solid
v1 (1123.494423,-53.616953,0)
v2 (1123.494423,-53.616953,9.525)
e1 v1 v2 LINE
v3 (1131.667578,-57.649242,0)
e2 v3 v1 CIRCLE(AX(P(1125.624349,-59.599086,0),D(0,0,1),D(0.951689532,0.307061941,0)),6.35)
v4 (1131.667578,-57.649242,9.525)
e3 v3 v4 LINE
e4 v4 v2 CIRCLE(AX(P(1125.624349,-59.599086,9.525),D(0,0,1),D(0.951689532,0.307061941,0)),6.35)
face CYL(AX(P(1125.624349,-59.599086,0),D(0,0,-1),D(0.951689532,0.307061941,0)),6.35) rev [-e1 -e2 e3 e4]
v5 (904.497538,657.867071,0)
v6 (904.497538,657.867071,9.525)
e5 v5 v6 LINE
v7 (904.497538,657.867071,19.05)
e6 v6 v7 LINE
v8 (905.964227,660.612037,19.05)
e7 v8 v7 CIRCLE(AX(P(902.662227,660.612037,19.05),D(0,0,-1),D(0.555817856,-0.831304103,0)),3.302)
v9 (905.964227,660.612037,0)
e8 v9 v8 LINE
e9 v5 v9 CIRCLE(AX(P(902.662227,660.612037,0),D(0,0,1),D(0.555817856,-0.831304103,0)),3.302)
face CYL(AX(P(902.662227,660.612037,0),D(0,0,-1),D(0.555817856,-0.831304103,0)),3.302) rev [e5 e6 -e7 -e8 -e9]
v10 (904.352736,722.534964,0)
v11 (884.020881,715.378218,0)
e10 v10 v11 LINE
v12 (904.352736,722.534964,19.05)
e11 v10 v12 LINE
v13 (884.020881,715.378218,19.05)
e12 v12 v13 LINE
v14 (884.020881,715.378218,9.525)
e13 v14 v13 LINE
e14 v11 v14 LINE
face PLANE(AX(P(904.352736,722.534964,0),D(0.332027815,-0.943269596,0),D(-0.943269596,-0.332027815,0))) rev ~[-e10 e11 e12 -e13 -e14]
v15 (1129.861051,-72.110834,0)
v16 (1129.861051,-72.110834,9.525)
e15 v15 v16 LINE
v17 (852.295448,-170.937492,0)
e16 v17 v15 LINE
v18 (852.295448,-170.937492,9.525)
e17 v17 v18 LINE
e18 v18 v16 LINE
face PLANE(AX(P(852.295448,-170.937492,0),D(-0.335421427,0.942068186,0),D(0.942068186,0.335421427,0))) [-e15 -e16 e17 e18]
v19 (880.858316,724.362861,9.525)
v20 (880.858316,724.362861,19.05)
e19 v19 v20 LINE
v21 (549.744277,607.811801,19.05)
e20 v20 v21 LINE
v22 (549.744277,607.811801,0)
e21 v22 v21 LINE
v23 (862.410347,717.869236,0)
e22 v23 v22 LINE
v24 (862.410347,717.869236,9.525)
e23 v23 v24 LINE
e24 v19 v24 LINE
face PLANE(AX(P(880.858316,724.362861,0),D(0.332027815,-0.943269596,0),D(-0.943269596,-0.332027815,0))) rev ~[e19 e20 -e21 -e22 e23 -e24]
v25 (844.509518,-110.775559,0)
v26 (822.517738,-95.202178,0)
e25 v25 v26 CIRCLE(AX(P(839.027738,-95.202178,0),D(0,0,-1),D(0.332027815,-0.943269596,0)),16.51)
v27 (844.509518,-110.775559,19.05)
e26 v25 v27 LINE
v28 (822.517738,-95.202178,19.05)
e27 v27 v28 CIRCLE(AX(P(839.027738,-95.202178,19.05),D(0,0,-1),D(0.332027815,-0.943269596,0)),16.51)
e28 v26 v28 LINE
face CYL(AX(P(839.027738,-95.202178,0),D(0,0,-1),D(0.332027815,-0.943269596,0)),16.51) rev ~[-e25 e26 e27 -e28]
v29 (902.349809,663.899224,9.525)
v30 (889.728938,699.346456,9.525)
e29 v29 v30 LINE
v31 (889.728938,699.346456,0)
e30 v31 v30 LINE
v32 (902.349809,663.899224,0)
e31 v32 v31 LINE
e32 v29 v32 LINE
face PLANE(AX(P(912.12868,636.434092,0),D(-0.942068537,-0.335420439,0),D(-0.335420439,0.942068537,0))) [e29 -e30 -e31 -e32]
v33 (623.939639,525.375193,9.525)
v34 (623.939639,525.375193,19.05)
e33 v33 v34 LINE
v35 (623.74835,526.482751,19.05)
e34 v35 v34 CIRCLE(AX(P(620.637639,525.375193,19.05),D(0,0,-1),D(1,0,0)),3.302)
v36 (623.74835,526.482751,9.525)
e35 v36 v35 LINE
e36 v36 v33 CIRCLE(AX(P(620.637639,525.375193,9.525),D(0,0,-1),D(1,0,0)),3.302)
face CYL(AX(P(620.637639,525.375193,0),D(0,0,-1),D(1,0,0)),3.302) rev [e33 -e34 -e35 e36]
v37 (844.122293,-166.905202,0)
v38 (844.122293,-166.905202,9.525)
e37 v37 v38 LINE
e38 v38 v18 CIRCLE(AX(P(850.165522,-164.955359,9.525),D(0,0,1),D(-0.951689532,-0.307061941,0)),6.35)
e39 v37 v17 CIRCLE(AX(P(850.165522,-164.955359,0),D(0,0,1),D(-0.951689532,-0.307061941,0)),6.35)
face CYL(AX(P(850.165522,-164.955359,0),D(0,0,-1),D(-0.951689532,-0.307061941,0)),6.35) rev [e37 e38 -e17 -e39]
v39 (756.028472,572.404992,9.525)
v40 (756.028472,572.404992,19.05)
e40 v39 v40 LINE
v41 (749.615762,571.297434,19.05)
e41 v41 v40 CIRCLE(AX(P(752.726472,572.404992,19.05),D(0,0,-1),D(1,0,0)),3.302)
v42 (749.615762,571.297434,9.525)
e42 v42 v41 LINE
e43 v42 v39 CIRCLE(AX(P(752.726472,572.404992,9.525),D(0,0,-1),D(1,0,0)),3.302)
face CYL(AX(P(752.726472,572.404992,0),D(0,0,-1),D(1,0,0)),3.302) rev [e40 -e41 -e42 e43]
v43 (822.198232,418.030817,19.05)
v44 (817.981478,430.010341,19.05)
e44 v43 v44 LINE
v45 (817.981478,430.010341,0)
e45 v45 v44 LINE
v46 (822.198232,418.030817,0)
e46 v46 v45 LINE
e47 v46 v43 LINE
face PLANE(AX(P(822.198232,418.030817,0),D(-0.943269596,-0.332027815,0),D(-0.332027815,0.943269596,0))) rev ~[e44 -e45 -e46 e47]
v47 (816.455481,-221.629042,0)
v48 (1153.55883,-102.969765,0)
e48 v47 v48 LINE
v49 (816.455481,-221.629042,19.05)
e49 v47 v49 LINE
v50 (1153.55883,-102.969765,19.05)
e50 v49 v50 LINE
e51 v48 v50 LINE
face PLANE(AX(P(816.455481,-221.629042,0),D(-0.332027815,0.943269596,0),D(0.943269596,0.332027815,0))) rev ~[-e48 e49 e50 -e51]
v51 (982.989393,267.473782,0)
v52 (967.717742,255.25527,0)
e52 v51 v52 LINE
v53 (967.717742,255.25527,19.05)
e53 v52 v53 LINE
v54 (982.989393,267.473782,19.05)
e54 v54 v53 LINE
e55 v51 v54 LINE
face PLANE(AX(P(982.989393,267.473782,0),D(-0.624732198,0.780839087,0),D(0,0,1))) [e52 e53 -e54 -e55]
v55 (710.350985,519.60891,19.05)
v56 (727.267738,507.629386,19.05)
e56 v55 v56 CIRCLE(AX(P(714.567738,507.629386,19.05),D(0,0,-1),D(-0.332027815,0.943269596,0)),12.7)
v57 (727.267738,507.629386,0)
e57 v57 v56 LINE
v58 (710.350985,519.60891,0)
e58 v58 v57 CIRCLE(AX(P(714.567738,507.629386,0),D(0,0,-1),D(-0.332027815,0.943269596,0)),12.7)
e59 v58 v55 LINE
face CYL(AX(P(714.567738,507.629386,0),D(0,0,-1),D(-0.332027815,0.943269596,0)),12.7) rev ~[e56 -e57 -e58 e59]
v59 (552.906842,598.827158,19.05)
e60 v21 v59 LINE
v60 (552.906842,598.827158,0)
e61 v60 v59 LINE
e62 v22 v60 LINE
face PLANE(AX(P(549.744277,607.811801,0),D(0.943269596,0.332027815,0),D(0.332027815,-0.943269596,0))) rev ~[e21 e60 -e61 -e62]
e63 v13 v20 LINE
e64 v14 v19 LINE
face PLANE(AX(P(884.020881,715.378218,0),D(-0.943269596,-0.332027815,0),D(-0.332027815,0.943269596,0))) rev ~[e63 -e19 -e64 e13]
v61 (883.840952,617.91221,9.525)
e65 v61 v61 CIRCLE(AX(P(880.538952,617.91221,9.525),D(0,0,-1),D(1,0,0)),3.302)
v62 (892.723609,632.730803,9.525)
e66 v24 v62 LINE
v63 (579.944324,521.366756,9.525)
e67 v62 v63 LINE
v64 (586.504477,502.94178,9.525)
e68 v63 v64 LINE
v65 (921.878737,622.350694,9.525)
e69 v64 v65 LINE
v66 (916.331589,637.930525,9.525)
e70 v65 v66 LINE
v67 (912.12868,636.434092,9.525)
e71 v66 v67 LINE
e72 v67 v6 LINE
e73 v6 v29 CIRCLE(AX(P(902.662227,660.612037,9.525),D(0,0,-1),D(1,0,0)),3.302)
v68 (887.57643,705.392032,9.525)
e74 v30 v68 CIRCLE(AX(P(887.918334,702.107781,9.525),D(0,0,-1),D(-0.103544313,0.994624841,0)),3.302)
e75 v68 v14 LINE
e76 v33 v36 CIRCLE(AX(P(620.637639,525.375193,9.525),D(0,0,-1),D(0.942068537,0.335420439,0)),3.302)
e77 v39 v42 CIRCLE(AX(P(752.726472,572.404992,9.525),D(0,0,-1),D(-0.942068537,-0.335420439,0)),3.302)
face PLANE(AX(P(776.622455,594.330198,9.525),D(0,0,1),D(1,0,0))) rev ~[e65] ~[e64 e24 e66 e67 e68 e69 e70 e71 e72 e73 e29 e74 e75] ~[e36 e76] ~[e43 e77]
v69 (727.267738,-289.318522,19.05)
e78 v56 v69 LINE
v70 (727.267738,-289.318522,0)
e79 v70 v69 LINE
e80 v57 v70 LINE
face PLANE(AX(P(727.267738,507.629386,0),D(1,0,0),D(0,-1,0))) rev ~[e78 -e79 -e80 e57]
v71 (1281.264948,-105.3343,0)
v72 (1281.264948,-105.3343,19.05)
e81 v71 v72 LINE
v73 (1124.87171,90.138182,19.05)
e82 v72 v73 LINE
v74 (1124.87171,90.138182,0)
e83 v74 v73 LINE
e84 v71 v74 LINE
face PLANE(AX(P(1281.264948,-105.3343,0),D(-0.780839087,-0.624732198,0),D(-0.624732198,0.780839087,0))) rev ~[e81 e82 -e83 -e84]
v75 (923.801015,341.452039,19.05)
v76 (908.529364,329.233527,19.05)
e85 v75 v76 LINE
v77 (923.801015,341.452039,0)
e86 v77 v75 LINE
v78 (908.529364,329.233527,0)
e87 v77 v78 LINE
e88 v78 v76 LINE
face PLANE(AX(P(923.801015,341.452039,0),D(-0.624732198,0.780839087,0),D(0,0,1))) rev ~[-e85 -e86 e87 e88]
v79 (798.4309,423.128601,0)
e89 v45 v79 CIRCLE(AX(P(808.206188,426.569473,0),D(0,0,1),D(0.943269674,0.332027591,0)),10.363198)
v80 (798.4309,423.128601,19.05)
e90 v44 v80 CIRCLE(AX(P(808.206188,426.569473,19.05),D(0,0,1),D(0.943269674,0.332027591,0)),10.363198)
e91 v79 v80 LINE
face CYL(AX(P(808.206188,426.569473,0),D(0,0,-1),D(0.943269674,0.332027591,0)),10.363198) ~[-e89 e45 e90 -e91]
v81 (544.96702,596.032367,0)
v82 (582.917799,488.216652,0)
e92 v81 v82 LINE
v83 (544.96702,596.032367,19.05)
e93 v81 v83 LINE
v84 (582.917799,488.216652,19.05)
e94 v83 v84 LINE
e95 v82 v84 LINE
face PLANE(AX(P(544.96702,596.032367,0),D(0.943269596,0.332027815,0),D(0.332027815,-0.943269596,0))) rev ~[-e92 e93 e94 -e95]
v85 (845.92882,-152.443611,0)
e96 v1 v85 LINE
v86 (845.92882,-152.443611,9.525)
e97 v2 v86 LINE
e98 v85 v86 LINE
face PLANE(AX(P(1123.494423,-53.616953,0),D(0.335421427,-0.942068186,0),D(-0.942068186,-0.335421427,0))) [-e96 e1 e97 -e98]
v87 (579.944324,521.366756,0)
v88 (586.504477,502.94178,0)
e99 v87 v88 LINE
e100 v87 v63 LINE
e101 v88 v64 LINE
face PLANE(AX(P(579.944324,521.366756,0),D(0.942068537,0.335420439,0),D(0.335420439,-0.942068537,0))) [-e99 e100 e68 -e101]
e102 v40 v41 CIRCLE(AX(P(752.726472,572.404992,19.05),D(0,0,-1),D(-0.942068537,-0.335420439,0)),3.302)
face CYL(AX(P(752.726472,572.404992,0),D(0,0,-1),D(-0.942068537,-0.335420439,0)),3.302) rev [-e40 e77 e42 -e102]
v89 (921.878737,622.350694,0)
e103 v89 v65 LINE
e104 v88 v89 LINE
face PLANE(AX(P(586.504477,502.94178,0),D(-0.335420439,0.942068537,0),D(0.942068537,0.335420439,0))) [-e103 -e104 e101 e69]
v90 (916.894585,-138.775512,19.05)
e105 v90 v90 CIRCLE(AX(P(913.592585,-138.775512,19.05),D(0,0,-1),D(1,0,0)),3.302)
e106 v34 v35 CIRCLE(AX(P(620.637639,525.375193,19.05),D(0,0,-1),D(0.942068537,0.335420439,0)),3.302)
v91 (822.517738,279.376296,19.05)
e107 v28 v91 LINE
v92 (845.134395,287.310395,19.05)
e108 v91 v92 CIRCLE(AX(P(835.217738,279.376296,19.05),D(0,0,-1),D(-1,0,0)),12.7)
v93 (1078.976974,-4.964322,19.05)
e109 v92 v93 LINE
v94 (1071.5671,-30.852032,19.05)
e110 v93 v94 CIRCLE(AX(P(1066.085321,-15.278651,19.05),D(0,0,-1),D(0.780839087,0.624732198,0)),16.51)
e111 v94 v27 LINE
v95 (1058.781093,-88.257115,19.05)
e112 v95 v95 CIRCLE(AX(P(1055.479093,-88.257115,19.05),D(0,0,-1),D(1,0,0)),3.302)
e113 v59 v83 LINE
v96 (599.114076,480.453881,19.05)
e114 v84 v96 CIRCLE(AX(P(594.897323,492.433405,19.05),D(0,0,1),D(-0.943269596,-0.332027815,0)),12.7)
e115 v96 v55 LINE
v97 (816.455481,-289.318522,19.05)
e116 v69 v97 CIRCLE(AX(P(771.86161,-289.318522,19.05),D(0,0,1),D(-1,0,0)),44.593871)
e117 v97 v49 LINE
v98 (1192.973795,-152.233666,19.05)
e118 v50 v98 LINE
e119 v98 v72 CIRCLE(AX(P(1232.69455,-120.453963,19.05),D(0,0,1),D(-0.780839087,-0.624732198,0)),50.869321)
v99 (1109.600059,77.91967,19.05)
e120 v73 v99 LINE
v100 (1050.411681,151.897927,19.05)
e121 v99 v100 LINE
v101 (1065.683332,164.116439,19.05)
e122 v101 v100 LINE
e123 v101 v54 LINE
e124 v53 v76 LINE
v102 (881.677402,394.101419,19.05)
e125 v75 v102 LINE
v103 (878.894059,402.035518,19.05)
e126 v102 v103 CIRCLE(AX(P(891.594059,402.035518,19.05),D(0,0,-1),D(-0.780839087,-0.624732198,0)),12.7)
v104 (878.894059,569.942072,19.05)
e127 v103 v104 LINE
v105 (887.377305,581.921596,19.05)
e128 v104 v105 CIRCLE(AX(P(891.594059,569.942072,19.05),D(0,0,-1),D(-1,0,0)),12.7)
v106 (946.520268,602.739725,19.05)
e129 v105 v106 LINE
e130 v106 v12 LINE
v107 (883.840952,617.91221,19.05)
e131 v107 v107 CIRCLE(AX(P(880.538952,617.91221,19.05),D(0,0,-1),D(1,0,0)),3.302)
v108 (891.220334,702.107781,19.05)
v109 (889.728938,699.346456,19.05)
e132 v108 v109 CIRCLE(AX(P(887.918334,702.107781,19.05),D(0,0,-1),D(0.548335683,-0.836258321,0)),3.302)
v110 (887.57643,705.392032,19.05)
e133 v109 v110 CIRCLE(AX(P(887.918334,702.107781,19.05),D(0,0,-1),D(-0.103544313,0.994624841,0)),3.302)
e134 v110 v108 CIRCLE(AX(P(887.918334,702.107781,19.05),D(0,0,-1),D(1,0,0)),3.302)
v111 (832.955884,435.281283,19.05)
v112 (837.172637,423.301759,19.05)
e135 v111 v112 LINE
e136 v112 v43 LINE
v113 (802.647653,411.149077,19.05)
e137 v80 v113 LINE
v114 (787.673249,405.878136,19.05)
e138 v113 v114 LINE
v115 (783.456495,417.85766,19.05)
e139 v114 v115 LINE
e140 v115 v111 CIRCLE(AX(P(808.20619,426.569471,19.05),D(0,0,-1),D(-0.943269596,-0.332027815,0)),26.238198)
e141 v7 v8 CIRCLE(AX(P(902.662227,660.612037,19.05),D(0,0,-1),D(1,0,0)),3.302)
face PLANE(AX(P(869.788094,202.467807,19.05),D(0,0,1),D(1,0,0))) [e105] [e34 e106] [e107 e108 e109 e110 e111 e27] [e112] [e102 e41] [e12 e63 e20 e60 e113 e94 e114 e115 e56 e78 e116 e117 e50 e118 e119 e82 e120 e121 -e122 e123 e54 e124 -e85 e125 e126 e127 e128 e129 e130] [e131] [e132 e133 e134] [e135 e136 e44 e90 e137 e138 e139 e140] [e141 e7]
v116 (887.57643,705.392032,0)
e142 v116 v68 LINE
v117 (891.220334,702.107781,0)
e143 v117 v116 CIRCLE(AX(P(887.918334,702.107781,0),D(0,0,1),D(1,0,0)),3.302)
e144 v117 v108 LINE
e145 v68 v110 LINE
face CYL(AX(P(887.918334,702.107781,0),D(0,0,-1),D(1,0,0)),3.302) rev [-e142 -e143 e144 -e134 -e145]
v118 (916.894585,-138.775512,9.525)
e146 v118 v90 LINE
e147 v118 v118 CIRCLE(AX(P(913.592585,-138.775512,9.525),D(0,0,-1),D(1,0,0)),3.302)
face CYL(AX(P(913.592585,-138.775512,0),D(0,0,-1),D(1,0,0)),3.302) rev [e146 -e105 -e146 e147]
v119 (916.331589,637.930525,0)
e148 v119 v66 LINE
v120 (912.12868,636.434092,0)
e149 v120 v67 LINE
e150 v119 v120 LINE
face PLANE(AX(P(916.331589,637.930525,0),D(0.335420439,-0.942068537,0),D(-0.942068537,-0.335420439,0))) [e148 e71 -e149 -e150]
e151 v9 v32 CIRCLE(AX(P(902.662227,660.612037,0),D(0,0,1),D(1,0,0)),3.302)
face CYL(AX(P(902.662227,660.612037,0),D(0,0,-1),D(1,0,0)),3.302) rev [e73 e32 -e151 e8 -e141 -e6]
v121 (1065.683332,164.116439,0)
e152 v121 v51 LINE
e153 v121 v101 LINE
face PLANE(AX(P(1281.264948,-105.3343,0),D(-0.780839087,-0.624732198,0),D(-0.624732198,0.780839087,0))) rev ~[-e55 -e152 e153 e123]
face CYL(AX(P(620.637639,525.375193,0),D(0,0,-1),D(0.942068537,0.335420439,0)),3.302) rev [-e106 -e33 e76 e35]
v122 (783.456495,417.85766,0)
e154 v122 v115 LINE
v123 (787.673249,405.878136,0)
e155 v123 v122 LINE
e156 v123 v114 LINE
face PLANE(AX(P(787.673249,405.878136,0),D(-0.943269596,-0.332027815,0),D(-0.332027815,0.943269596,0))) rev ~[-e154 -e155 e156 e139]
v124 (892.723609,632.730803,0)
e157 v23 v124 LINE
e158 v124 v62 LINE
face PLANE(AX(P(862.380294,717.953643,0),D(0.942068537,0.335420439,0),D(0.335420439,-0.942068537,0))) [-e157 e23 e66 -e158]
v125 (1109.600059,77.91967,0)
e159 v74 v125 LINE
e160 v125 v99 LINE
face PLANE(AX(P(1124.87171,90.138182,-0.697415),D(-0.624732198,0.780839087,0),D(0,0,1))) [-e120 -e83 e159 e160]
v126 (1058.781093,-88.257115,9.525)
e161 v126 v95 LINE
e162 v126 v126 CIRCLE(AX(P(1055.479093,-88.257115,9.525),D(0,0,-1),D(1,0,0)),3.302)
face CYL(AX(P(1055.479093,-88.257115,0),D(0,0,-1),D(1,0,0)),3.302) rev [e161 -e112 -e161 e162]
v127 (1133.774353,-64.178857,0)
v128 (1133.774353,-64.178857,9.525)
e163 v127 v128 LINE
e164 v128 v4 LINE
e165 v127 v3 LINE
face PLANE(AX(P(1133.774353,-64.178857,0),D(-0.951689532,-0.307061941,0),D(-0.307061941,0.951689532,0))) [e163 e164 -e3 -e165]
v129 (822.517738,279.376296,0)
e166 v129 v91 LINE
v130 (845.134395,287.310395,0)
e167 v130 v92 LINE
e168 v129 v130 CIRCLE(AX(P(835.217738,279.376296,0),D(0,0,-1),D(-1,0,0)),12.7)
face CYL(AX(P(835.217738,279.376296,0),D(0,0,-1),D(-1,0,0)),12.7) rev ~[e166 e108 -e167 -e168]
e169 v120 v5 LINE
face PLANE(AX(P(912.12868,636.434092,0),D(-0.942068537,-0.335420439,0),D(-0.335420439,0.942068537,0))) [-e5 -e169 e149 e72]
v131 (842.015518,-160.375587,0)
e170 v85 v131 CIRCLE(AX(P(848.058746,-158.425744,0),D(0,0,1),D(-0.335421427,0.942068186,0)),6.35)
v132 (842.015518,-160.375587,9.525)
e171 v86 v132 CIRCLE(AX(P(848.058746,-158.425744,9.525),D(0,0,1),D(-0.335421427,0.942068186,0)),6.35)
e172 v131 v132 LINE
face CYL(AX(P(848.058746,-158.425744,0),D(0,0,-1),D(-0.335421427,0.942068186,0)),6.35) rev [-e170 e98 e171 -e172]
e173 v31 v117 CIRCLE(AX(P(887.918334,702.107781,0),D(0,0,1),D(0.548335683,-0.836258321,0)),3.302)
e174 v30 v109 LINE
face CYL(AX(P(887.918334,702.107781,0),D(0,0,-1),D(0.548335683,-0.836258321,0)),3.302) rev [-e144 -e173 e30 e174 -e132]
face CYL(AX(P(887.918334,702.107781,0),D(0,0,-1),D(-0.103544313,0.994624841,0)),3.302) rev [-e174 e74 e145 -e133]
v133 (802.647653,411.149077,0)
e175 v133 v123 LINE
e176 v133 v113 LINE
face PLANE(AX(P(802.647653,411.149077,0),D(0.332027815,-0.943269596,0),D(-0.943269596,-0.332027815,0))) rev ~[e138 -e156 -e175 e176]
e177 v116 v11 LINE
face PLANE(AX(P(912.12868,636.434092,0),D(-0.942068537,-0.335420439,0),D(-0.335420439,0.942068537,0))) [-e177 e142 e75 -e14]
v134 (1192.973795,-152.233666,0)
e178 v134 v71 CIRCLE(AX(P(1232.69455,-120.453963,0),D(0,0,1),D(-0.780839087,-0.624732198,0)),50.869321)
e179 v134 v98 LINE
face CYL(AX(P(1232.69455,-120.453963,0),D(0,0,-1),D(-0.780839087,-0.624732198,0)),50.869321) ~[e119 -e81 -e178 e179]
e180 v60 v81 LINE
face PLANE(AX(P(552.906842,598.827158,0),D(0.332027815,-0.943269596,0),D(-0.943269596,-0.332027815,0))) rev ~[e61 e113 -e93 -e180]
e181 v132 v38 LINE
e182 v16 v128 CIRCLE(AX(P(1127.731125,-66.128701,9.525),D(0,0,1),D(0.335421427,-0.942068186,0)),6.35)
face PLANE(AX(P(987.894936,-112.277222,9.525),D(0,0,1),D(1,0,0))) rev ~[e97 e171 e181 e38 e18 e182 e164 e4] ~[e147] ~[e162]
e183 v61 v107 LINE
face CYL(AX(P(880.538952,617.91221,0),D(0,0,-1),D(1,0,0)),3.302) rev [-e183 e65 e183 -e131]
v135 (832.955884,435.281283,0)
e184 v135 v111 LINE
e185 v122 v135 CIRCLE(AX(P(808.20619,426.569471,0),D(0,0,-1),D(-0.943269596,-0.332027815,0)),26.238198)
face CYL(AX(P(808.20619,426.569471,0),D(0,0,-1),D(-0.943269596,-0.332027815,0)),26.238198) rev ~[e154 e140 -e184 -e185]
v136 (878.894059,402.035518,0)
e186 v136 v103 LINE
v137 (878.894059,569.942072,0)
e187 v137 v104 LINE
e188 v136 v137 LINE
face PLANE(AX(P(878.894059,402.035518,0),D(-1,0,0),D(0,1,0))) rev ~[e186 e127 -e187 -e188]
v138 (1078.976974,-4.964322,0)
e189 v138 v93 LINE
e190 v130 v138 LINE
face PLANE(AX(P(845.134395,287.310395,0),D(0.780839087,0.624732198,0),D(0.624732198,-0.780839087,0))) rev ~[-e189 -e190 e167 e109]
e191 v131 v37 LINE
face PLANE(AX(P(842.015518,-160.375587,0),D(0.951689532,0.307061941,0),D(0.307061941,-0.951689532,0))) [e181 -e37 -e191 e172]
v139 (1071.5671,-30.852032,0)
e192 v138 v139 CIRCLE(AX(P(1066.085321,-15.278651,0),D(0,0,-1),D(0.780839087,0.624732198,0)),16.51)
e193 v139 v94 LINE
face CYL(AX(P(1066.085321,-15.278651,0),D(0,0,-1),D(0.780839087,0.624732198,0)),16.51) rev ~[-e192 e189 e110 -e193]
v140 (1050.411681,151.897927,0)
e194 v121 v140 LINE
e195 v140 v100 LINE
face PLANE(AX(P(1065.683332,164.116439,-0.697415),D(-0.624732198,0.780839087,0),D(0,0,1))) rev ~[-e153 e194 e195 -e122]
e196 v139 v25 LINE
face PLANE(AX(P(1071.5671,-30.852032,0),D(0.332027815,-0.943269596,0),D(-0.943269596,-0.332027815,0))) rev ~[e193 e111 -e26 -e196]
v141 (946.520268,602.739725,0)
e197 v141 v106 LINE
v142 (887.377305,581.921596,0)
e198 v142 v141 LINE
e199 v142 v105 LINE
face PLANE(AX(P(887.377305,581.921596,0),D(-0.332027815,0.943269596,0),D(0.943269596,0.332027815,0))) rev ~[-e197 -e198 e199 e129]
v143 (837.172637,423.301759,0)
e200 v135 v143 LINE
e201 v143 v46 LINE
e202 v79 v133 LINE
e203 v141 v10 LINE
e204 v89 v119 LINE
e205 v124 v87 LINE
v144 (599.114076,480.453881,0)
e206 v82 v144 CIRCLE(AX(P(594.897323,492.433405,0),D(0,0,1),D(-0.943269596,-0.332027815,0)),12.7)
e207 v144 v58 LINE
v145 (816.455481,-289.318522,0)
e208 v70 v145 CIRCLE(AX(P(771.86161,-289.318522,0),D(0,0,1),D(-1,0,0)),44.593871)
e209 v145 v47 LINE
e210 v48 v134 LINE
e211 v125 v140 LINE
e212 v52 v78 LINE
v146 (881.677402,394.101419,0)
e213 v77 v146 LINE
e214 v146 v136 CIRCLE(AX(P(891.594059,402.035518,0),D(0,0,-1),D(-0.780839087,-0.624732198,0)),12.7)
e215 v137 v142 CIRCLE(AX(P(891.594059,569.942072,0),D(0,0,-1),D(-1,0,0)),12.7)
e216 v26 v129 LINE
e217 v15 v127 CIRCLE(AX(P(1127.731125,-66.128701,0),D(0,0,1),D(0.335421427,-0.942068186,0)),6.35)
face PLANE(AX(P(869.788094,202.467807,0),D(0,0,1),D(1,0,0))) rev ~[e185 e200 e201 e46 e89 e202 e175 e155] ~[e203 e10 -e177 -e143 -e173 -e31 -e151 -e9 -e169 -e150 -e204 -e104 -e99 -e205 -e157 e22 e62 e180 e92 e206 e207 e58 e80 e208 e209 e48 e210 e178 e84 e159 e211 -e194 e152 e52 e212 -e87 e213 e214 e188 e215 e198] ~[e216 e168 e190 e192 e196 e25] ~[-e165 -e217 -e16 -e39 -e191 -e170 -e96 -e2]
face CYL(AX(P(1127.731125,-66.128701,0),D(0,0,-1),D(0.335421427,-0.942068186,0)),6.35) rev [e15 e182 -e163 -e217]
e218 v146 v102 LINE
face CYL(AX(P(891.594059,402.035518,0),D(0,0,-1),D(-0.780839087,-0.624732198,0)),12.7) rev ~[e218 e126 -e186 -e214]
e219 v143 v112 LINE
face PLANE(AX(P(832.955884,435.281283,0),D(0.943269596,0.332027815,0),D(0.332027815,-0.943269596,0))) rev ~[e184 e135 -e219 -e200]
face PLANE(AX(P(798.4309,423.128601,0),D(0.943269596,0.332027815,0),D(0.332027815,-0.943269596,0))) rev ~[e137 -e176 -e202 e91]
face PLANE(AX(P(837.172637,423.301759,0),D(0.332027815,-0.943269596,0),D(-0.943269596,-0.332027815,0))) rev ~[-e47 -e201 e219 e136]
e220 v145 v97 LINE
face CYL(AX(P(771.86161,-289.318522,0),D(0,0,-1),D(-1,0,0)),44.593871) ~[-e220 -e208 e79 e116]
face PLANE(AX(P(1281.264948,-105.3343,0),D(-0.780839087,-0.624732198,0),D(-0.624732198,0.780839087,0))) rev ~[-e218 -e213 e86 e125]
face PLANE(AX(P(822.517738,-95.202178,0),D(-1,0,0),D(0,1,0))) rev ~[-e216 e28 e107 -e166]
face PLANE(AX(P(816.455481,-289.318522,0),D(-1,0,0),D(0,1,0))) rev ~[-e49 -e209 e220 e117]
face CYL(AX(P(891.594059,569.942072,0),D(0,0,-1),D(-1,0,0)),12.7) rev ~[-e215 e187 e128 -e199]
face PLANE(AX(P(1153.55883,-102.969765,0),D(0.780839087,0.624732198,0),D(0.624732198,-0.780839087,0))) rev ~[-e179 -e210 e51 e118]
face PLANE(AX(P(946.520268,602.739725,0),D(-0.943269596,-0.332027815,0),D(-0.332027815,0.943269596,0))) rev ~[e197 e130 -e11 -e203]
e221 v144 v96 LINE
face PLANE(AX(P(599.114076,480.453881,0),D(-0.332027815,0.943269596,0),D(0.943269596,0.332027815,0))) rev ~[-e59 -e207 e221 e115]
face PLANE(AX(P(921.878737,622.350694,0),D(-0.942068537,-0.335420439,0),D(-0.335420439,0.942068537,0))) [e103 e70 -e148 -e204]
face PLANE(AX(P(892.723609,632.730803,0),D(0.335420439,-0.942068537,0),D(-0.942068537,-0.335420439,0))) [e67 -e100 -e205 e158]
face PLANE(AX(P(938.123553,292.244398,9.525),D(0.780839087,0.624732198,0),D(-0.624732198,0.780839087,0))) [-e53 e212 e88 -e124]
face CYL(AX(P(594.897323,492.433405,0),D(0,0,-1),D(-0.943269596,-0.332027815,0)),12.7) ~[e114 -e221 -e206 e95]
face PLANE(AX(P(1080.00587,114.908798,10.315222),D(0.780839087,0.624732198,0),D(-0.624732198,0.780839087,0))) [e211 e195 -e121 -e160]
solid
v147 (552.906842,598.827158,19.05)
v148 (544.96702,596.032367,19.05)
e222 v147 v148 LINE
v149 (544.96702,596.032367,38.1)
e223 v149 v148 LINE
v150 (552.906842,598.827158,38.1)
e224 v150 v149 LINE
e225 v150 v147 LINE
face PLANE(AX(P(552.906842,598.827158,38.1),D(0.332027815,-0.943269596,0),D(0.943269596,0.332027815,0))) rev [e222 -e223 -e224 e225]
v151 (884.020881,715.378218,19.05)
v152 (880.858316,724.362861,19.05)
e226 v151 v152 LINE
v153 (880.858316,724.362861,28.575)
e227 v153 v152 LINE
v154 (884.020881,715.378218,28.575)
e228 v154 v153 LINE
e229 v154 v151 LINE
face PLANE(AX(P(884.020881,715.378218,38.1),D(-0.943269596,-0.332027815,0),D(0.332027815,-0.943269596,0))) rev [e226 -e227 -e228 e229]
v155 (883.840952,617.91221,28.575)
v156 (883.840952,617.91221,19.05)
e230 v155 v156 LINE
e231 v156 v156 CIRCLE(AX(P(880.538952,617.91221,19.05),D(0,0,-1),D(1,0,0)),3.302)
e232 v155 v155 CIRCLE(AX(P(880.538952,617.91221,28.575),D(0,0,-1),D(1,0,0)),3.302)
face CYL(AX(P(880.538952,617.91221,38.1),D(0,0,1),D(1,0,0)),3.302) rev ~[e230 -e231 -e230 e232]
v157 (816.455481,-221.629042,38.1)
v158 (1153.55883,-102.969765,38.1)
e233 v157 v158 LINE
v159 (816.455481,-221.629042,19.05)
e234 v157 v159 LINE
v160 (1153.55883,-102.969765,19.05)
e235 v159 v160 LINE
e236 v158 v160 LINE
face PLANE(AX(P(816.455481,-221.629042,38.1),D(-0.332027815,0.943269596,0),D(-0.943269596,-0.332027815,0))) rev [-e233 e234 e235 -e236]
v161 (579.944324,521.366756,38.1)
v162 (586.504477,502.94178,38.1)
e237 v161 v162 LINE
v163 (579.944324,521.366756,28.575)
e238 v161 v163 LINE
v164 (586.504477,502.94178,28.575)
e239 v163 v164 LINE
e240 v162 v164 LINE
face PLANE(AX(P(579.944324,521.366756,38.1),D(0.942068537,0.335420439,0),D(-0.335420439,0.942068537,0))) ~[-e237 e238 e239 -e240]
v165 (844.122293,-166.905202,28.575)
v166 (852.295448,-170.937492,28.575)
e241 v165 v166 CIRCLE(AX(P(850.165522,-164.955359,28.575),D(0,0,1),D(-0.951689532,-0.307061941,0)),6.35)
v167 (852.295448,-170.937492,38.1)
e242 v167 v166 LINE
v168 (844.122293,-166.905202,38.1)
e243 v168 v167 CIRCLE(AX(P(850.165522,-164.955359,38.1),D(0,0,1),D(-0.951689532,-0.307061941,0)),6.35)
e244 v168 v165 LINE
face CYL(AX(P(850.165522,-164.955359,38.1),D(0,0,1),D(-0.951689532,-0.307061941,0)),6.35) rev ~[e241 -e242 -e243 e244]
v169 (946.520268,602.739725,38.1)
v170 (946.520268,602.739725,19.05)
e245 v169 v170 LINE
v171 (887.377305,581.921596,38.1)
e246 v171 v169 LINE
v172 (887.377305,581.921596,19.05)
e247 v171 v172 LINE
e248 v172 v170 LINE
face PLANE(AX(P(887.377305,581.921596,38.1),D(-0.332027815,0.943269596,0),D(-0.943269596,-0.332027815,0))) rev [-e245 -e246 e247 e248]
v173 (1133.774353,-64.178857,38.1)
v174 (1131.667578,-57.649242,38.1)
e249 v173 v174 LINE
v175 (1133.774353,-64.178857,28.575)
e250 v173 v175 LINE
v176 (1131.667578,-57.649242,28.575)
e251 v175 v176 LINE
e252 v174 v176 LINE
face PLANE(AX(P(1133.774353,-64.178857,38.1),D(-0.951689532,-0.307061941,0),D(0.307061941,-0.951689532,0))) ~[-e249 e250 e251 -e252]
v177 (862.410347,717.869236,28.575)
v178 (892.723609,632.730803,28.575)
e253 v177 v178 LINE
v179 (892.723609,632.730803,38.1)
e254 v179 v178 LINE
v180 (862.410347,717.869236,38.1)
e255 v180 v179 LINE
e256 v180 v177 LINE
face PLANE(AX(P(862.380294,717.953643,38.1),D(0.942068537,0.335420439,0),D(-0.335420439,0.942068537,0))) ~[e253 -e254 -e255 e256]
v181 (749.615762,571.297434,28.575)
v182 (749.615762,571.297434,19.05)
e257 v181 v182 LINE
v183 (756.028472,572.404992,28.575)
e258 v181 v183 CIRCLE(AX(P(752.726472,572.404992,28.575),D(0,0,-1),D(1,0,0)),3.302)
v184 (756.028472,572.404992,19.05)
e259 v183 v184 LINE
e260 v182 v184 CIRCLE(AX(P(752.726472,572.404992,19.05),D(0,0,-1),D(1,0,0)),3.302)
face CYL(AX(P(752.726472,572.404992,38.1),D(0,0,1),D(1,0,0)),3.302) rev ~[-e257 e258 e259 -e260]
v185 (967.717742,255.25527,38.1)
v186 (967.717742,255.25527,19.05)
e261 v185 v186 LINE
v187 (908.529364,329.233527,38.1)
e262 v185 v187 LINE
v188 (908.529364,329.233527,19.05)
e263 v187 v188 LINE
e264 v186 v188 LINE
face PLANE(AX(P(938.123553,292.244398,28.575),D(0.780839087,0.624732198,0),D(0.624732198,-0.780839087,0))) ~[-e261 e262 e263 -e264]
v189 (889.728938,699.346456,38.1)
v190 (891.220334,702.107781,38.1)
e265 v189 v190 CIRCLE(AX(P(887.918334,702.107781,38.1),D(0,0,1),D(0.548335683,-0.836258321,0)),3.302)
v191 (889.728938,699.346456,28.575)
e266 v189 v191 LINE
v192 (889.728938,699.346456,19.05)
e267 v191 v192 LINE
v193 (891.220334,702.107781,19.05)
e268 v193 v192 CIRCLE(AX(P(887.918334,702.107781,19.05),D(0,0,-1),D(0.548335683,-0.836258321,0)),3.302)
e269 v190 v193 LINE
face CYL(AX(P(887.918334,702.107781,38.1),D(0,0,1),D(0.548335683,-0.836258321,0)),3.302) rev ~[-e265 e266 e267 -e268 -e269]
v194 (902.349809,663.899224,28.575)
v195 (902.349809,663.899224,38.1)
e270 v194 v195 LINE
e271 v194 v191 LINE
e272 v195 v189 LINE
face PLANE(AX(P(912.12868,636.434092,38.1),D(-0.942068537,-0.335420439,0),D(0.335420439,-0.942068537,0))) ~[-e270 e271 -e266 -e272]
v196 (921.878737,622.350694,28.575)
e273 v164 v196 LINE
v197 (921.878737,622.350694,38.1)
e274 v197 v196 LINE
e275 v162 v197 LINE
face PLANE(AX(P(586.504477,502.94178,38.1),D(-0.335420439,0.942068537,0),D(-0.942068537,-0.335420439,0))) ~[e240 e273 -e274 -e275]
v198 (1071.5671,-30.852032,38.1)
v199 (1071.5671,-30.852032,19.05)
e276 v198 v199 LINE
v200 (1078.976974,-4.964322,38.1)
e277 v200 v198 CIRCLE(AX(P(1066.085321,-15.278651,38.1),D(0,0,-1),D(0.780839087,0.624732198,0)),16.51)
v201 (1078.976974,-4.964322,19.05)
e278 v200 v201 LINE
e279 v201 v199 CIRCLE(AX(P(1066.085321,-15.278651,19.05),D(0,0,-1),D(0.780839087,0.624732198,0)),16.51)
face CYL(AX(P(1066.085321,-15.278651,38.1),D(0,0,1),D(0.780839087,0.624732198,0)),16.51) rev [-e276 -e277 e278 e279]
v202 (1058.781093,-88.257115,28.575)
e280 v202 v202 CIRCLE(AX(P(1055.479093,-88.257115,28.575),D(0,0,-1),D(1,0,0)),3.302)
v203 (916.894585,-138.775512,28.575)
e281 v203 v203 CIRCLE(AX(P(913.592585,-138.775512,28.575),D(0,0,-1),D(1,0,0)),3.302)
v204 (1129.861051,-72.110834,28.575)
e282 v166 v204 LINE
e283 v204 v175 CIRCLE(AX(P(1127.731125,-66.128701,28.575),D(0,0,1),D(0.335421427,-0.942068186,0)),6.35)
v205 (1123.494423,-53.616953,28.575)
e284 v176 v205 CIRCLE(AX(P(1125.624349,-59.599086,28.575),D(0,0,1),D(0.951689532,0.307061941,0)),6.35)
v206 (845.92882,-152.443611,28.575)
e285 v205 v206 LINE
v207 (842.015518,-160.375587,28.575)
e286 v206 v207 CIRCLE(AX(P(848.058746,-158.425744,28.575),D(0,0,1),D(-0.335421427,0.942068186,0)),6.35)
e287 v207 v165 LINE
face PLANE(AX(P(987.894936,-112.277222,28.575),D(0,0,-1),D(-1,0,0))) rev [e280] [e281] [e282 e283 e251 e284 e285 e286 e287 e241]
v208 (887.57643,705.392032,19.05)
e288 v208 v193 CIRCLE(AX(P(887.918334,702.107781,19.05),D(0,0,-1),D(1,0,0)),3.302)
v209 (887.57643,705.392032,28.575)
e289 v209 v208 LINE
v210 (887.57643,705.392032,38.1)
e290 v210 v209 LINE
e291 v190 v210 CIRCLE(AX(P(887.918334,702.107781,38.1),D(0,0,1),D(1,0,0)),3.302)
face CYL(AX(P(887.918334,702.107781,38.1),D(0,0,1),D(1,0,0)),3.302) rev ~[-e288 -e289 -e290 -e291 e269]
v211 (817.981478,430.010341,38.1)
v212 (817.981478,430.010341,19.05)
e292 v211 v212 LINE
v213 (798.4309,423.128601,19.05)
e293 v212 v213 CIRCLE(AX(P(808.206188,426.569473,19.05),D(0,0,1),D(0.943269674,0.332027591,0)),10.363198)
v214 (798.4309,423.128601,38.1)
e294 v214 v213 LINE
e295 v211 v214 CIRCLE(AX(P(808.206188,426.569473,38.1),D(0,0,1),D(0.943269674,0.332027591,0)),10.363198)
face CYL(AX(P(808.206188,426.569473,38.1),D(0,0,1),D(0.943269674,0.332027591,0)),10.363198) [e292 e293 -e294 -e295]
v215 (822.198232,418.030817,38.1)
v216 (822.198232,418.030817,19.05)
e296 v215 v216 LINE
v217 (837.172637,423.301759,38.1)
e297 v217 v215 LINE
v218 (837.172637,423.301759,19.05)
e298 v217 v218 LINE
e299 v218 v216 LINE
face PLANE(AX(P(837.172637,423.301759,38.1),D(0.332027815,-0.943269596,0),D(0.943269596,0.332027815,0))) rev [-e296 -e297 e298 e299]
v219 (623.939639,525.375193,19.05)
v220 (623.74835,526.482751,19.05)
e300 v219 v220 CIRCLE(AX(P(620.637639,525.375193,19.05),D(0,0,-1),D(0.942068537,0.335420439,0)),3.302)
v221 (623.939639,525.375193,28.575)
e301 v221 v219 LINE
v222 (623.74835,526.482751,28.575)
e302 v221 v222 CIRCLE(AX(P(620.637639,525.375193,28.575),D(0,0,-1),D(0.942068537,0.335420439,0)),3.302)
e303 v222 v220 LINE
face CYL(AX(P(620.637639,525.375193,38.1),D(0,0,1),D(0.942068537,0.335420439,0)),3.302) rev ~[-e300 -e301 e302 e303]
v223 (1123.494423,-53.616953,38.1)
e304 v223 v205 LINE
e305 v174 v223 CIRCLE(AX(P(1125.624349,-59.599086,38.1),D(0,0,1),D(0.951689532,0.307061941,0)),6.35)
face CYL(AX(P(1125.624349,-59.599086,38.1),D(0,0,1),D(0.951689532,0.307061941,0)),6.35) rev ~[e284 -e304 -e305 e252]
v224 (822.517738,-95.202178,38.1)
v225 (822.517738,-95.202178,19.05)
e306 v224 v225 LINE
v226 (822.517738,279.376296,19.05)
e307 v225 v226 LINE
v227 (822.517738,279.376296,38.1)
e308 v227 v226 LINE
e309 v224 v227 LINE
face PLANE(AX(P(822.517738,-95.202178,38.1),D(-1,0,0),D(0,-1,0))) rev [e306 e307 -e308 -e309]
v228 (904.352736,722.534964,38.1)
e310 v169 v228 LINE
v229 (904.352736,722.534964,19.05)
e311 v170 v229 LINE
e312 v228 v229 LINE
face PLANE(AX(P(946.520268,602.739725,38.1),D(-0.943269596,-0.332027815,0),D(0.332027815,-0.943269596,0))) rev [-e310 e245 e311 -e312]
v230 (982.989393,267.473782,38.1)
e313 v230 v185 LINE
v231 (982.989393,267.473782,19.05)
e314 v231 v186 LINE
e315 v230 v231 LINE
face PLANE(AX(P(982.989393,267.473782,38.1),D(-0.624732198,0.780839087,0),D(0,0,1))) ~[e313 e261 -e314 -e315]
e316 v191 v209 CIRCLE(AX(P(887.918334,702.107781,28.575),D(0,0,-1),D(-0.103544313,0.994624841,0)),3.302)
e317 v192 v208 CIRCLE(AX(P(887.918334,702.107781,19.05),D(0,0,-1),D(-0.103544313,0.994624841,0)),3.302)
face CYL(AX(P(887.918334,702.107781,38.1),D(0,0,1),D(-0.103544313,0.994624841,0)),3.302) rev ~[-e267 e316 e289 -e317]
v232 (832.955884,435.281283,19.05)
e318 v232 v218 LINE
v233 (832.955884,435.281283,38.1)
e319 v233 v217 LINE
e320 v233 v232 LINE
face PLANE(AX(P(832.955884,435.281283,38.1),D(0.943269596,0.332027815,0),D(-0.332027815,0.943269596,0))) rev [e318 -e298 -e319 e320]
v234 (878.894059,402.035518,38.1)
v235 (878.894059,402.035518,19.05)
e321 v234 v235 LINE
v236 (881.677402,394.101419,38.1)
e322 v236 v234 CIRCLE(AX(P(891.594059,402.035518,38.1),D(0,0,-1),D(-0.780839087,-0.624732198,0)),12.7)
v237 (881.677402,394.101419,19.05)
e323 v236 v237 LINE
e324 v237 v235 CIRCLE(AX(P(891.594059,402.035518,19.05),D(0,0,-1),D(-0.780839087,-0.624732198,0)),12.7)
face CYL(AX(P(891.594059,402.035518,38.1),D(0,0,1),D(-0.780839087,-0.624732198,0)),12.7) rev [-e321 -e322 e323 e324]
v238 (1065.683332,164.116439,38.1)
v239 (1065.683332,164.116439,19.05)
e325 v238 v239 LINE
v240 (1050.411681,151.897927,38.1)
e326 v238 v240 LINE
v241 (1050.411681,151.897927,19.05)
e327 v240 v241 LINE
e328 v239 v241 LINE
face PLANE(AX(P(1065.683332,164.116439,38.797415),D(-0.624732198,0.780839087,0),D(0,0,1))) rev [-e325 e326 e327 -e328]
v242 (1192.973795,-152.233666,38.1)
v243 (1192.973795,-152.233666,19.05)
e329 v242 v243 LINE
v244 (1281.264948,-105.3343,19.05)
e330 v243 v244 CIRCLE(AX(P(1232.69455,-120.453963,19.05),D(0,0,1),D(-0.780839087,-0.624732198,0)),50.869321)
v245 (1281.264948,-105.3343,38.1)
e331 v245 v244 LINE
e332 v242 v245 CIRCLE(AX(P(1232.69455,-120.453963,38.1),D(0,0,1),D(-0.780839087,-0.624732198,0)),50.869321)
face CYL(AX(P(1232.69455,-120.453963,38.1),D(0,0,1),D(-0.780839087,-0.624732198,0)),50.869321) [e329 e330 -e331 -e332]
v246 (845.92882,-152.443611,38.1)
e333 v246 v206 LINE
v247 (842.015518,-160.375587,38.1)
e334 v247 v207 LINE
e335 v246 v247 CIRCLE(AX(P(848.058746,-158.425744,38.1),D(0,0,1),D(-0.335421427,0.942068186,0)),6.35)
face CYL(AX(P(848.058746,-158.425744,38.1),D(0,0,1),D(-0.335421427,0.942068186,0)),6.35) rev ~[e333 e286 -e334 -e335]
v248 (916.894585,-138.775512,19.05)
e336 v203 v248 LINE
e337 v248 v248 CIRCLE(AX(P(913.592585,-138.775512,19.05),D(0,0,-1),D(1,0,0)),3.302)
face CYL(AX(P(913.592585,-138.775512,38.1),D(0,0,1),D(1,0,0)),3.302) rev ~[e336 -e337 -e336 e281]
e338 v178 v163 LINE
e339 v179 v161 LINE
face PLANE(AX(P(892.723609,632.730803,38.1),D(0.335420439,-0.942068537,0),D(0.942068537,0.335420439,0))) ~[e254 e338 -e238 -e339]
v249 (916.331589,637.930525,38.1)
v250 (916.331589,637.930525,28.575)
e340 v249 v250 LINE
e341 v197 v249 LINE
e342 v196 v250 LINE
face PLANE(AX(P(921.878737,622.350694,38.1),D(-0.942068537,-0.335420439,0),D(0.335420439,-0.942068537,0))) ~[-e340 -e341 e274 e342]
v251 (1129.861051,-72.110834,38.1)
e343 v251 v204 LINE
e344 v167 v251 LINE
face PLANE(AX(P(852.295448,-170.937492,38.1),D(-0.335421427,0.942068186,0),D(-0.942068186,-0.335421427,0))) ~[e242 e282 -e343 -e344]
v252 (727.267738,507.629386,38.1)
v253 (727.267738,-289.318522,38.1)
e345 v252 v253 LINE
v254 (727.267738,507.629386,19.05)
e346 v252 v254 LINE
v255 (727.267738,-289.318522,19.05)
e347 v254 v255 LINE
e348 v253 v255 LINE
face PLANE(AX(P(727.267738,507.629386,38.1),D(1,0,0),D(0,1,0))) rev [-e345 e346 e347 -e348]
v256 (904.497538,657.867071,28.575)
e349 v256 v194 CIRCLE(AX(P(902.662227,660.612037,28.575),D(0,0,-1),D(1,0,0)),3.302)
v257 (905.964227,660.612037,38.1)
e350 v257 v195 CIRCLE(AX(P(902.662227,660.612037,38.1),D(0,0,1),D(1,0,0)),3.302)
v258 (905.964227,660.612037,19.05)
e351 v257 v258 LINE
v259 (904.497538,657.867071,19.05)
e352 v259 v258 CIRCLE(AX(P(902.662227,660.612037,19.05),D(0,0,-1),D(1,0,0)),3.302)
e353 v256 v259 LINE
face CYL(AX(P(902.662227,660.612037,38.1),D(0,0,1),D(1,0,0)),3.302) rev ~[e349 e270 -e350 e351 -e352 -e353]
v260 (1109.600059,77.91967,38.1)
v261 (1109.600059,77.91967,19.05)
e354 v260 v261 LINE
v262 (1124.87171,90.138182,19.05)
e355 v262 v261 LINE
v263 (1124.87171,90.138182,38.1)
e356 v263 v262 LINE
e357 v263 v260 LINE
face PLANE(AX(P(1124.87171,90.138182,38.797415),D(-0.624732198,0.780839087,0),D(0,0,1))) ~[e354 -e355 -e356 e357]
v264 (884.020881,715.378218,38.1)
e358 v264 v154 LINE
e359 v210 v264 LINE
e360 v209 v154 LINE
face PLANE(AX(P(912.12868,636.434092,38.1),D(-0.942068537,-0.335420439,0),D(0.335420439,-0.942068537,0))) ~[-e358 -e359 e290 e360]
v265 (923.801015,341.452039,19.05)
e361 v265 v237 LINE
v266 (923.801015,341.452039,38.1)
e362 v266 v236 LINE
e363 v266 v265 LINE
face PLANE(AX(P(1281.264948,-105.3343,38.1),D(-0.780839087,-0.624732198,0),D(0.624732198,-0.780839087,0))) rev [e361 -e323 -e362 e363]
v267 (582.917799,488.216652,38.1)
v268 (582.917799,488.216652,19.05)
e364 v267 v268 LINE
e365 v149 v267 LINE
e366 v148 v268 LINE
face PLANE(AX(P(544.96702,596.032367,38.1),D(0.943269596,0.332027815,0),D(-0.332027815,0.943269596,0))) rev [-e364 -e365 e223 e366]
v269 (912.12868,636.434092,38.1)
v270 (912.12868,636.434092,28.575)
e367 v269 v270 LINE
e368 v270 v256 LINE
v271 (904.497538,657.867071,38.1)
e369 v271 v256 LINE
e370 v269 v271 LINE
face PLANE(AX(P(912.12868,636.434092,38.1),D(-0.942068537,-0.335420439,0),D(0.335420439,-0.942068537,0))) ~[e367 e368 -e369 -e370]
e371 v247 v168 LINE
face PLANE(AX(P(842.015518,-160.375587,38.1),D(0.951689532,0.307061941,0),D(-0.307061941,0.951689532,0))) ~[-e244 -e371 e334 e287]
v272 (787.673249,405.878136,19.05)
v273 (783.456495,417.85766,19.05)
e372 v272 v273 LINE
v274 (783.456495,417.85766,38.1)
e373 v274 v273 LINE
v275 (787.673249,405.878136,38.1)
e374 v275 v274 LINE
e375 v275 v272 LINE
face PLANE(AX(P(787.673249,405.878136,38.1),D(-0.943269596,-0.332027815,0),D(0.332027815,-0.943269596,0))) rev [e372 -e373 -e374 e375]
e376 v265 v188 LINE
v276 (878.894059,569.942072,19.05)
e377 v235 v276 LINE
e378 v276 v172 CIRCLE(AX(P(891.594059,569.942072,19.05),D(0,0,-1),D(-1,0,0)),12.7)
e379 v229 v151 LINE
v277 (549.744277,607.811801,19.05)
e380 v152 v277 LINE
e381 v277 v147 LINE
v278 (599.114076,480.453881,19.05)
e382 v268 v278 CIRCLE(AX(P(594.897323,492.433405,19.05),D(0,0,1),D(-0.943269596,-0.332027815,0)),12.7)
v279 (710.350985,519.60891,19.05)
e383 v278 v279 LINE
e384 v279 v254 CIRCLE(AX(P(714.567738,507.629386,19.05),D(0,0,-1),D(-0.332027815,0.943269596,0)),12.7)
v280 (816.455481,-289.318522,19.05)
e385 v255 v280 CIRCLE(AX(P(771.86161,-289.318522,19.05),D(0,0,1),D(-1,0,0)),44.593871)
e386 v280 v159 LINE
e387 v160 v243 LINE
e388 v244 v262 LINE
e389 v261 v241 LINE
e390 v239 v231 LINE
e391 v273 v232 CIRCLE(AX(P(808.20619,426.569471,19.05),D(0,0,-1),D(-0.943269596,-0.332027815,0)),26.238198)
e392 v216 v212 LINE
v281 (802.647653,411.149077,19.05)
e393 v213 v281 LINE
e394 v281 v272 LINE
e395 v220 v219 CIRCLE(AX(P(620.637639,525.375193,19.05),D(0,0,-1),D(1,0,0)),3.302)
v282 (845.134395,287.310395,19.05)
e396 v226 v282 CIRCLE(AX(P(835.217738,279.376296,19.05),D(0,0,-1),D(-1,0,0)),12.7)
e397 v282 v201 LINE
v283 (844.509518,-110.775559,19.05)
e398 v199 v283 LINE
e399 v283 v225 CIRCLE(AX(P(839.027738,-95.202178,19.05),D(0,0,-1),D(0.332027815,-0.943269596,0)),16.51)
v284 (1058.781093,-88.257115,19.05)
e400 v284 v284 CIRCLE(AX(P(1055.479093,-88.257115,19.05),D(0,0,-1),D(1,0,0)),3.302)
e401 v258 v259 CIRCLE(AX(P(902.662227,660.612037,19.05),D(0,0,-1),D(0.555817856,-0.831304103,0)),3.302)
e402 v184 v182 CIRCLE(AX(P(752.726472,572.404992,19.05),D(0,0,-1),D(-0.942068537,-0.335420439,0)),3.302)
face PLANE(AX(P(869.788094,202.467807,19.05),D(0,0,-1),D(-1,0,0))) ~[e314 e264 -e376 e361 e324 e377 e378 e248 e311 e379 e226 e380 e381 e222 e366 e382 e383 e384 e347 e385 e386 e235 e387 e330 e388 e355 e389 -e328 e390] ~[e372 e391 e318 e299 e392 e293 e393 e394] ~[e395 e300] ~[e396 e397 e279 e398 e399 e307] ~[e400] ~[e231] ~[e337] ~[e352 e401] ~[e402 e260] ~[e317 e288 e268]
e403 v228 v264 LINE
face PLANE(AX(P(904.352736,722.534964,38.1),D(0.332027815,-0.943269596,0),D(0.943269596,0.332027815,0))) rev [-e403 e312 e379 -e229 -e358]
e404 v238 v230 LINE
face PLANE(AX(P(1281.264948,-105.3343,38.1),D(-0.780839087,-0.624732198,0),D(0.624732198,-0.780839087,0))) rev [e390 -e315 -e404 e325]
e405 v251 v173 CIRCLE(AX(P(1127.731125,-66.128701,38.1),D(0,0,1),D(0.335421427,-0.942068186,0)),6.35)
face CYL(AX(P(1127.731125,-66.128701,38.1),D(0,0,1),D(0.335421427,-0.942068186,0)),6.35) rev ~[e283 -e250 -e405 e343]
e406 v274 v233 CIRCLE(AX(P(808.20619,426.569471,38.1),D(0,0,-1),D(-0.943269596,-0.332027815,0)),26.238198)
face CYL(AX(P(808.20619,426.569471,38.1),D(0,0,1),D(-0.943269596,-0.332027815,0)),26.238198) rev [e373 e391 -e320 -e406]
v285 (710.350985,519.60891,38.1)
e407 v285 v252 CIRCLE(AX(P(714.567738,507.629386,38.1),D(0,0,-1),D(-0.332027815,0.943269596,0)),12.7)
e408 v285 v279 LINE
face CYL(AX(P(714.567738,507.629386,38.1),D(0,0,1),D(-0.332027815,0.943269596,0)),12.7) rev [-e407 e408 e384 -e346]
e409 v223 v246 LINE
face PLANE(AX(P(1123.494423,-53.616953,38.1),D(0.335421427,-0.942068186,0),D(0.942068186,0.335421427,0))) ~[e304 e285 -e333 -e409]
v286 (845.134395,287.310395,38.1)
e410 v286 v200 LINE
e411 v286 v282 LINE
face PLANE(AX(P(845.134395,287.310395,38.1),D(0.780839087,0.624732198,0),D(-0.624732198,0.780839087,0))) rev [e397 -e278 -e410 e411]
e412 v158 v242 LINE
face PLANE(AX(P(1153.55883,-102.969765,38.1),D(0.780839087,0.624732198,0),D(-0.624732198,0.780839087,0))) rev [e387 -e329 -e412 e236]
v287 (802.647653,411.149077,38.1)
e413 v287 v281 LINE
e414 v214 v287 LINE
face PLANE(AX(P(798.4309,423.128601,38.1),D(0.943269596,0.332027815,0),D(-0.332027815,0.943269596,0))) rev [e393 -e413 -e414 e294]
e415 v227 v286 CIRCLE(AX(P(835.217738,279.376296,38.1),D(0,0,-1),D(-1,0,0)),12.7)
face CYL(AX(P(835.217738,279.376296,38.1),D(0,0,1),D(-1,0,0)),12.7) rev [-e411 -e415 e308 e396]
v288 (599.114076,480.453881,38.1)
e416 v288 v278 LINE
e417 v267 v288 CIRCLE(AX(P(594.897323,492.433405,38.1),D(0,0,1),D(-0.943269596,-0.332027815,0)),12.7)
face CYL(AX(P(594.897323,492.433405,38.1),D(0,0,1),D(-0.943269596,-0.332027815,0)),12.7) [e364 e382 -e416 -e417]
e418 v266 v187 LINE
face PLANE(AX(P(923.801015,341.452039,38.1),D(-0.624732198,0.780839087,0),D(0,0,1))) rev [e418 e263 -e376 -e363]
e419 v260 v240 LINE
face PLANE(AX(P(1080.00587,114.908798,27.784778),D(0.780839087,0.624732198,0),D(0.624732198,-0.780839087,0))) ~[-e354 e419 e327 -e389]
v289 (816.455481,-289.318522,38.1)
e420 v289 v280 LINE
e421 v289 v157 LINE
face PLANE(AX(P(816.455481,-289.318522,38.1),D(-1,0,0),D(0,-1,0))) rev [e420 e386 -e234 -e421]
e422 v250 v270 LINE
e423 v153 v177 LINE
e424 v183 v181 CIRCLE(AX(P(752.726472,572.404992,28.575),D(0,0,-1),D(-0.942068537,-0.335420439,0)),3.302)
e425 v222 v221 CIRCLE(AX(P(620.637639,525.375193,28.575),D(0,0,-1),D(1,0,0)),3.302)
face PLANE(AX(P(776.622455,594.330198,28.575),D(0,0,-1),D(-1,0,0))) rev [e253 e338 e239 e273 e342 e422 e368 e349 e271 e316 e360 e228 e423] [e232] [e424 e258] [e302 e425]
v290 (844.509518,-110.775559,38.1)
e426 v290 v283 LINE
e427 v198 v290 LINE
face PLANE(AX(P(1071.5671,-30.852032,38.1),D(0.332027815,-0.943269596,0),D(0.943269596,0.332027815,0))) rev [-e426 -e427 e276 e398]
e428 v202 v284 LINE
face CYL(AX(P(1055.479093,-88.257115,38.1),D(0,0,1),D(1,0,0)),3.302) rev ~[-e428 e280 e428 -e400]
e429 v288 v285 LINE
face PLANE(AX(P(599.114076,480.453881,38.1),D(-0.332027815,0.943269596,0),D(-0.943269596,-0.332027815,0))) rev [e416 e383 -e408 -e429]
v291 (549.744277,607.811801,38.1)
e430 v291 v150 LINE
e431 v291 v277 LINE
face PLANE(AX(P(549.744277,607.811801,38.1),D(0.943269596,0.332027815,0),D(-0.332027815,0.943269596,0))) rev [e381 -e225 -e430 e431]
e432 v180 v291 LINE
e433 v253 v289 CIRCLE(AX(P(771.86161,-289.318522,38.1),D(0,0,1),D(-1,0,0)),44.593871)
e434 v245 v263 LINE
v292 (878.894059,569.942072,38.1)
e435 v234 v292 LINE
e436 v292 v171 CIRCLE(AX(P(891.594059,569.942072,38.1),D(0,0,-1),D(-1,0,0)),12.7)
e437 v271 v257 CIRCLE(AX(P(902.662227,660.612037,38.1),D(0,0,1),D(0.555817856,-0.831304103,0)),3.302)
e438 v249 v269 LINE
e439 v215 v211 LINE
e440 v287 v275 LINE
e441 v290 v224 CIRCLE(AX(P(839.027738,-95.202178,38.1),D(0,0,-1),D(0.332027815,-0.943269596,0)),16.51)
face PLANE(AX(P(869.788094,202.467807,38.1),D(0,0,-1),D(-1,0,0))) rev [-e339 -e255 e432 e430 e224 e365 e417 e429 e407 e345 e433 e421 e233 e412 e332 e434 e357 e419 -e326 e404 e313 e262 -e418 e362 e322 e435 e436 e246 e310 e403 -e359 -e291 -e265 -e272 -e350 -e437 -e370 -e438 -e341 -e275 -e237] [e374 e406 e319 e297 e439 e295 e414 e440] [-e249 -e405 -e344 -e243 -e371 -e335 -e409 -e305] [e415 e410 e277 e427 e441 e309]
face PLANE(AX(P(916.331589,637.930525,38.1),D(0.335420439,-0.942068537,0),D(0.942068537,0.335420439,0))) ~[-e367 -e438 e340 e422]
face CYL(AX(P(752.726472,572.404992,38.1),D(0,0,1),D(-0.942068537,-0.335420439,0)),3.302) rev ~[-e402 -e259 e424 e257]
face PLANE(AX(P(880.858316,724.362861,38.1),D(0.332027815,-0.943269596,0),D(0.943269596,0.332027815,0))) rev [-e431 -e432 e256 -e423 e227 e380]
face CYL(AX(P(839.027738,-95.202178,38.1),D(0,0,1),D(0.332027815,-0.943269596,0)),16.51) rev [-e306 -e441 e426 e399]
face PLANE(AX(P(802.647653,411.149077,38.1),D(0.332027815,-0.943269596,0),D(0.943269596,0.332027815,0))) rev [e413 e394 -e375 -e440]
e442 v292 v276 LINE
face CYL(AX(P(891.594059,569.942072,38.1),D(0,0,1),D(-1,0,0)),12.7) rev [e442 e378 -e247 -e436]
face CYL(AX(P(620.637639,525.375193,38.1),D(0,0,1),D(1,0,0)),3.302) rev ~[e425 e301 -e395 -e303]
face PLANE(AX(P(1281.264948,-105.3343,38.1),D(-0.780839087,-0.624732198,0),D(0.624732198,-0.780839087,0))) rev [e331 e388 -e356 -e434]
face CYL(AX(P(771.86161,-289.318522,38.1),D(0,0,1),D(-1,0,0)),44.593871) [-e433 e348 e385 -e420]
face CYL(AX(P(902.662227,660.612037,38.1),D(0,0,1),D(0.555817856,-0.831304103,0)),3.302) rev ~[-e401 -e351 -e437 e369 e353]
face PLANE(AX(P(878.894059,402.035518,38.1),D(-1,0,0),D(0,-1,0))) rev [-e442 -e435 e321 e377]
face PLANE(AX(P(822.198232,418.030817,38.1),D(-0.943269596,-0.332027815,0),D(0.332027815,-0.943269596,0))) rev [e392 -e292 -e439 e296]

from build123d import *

# Parameters (mm, degrees)
F1_DEPTH = 19.05
F3_DEPTH = 9.525
F5_DEPTH = 9.525
F6_W     = 94.742
F6_H     = 19.05
F6_H_2   = 22.0252738774
F7_DEPTH = 19.558
F8_R     = 3.302
F9_DEPTH = 19.051


# Not quite as in the source:
# - ends of sketch curves that miss each other by under 0.0002 mm in the source are joined
# - a feature names something its author has since deleted; it is built from what else it names
# - the program builds the solid bodies; features that only make, move or delete a surface that nothing else refers to are left out


with BuildPart() as f1:
    # F0 (on Top) → F1 (new body)
    with BuildSketch(Plane.XY):
        with BuildLine():
            Line((727.2677384075, 507.6293858847), (727.2677384075, -289.3185215378))
            ThreePointArc((727.2677384075, -289.3185215378), (771.8616098047, -333.912392935), (816.4554812019, -289.3185215378))
            Line((816.4554812019, -289.3185215378), (816.4554812019, -221.6290421598))
            Line((816.4554812019, -221.6290421598), (1153.5588304871, -102.9697649078))
            Line((1153.5588304871, -102.9697649078), (1192.9737952894, -152.2336658633))
            ThreePointArc((1192.9737952894, -152.2336658633), (1256.5580507142, -165.3785793409), (1281.2649482254, -105.3342998163))
            Line((1281.2649482254, -105.3342998163), (881.6774022659, 394.10141923))
            ThreePointArc((881.6774022659, 394.10141923), (879.6100790274, 397.83144491), (878.8940586752, 402.0355181492))
            Line((878.8940586752, 402.0355181492), (878.8940586752, 569.9420720746))
            ThreePointArc((878.8940586752, 569.9420720746), (881.2296299338, 577.2815963686), (887.3773054254, 581.9215959395))
            Line((887.3773054254, 581.9215959395), (946.5202680448, 602.7397254948))
            Line((946.5202680448, 602.7397254948), (904.3527355464, 722.5349641439))
            Line((904.3527355464, 722.5349641439), (884.020881133, 715.3782178375))
            Line((884.020881133, 715.3782178375), (880.8583161956, 724.3628607361))
            Line((880.8583161956, 724.3628607361), (549.7442765696, 607.8118009104))
            Line((549.7442765696, 607.8118009104), (552.906841507, 598.8271580117))
            Line((552.906841507, 598.8271580117), (544.9670195991, 596.0323666485))
            Line((544.9670195991, 596.0323666485), (582.9177988478, 488.2166518643))
            ThreePointArc((582.9177988478, 488.2166518643), (589.40821497, 480.9809077363), (599.1140759625, 480.4538812492))
            Line((599.1140759625, 480.4538812492), (710.3509851577, 519.6089097496))
            ThreePointArc((710.3509851577, 519.6089097497), (721.9072627016, 517.9938146262), (727.2677384075, 507.6293858847))
        make_face()
        with BuildLine():
            ThreePointArc((844.5095176323, -110.7755588107), (829.4863568252, -108.6759351502), (822.5177384075, -95.2021777863))
            Line((822.5177384075, -95.2021777863), (822.5177384075, 279.3762959499))
            ThreePointArc((822.5177384075, 279.3762959499), (831.0136651683, 291.3602755977), (845.1343948168, 287.3103948691))
            Line((845.1343948168, 287.3103948691), (1078.976974464, -4.9643221252))
            ThreePointArc((1078.976974464, -4.9643221252), (1081.9579117622, -19.8218837855), (1071.5671003568, -30.8520317446))
            Line((1071.5671003568, -30.8520317446), (844.5095176323, -110.7755588107))
        make_face(mode=Mode.SUBTRACT)
        with BuildLine():
            Line((822.1982316908, 418.0308171084), (817.981478441, 430.0103409733))
            ThreePointArc((817.981478441, 430.0103409733), (804.7653209472, 436.3447634256), (798.4309001253, 423.1286012999))
            Line((798.4309001253, 423.1286012999), (802.6476533752, 411.149077435))
            Line((802.6476533752, 411.149077435), (787.6732485441, 405.8781358727))
            Line((787.6732485441, 405.8781358727), (783.4564952942, 417.8576597376))
            ThreePointArc((783.4564952942, 417.8576597376), (799.4943781806, 451.3191657439), (832.9558841868, 435.2812828576))
            Line((832.9558841868, 435.2812828576), (837.1726374367, 423.3017589927))
            Line((837.1726374367, 423.3017589927), (822.1982316908, 418.0308171084))
        make_face(mode=Mode.SUBTRACT)
    extrude(amount=F1_DEPTH)

    # F2 (on face) → F3 (cut)
    with BuildSketch(Plane.XY):
        with BuildLine():
            ThreePointArc((844.1222933391, -166.9052020902), (847.3560158569, -170.6500208272), (852.2954479263, -170.9374917442))
            Line((852.2954479263, -170.9374917442), (1129.8610507564, -72.1108335167))
            ThreePointArc((1129.8610507564, -72.1108335167), (1133.425786756, -68.9382065458), (1133.77435322, -64.1788572139))
            Line((1133.77435322, -64.1788572139), (1131.667577719, -57.6492424267))
            ThreePointArc((1131.667577719, -57.6492424267), (1128.4338552012, -53.9044236898), (1123.4944231318, -53.6169527728))
            Line((1123.4944231318, -53.6169527728), (845.9288203018, -152.4436110002))
            ThreePointArc((845.9288203018, -152.4436110002), (842.3640843021, -155.6162379711), (842.0155178382, -160.3755873031))
            Line((842.0155178382, -160.3755873031), (844.1222933391, -166.9052020902))
        make_face()
    extrude(amount=F3_DEPTH, mode=Mode.SUBTRACT)

    # F4 (on face) → F5 (cut)
    with BuildSketch(Plane.XY):
        Polygon((579.9443241227, 521.366756094), (586.5044770697, 502.9417796404), (921.8787370542, 622.3506942479), (916.3315891482, 637.930524532), (912.1286802344, 636.4340924814), (884.020881133, 715.3782178375), (880.8583161956, 724.3628607361), (862.3802941818, 717.9536434315), (892.7236092325, 632.7308033777), align=None)
    extrude(amount=F5_DEPTH, mode=Mode.SUBTRACT)

    # F6 (on face) → F7 (cut)
    with BuildSketch(Plane(origin=(729.8159568657, 583.9097126711, 0), x_dir=(-0.6247321984, 0.7808390873, 0), z_dir=(0.7808390873, 0.6247321984, 0))):
        with Locations((-357.8801403508, 9.525)):
            Rectangle(F6_W, F6_H)
        with Locations((-584.9891603508, 10.3152221296)):
            Rectangle(F6_W, F6_H_2)
    extrude(amount=-F7_DEPTH, mode=Mode.SUBTRACT)

    # F8 (on face) → F9 (cut, through all)
    with BuildSketch(Plane.XY):
        with BuildLine():
            ThreePointArc((902.3498094673, 663.8992240234), (899.5515171423, 659.5044786379), (904.4975380125, 657.8670707805))
            Line((904.4975380125, 657.8670707805), (902.3498094673, 663.8992240234))
        make_face()
        with BuildLine():
            ThreePointArc((887.5764301968, 705.3920317976), (884.8076232072, 701.0002222812), (889.7289379426, 699.3464555963))
            Line((889.7289379426, 699.3464555963), (887.5764301968, 705.3920317976))
        make_face()
        with BuildLine():
            Line((887.5764301968, 705.3920317976), (889.7289379426, 699.3464555963))
            ThreePointArc((889.7289379426, 699.3464555963), (890.8236579238, 700.5386106968), (891.2203335175, 702.107780571))
            ThreePointArc((891.2203335175, 702.107780571), (890.1290165833, 704.5605513272), (887.5764301968, 705.3920317976))
        make_face()
        with BuildLine():
            Line((902.3498094673, 663.8992240234), (904.4975380125, 657.8670707805))
            ThreePointArc((904.4975380125, 657.8670707805), (905.5745632393, 659.0559185948), (905.9642274527, 660.6120369276))
            ThreePointArc((905.9642274527, 660.6120369276), (904.8838934731, 663.0548639976), (902.3498094673, 663.8992240234))
        make_face()
        with Locations((880.5389518172, 617.9122097817)):
            Circle(F8_R)
        with BuildLine():
            ThreePointArc((623.7483495144, 526.4827509324), (617.3838130375, 524.8132146381), (623.9396392041, 525.3751926427))
            ThreePointArc((623.9396392041, 525.3751926427), (623.8914653707, 525.9371706472), (623.7483495144, 526.4827509324))
        make_face()
        with BuildLine():
            ThreePointArc((756.0284718398, 572.4049919407), (752.1644938352, 575.6588181073), (749.6157615295, 571.2974336509))
            ThreePointArc((749.6157615295, 571.2974336509), (753.2884498444, 569.1511657741), (756.0284718398, 572.4049919407))
        make_face()
        with Locations((1055.4790926394, -88.2571151612)):
            Circle(F8_R)
        with Locations((913.5925848765, -138.7755124943)):
            Circle(F8_R)
    extrude(amount=F9_DEPTH, mode=Mode.SUBTRACT)


with BuildPart() as f12_1:
    # F12: instance of F1
    add(f1.part.mirror(Plane.XY.offset(19.05)))


solid = Compound([f1.part, f12_1.part])
